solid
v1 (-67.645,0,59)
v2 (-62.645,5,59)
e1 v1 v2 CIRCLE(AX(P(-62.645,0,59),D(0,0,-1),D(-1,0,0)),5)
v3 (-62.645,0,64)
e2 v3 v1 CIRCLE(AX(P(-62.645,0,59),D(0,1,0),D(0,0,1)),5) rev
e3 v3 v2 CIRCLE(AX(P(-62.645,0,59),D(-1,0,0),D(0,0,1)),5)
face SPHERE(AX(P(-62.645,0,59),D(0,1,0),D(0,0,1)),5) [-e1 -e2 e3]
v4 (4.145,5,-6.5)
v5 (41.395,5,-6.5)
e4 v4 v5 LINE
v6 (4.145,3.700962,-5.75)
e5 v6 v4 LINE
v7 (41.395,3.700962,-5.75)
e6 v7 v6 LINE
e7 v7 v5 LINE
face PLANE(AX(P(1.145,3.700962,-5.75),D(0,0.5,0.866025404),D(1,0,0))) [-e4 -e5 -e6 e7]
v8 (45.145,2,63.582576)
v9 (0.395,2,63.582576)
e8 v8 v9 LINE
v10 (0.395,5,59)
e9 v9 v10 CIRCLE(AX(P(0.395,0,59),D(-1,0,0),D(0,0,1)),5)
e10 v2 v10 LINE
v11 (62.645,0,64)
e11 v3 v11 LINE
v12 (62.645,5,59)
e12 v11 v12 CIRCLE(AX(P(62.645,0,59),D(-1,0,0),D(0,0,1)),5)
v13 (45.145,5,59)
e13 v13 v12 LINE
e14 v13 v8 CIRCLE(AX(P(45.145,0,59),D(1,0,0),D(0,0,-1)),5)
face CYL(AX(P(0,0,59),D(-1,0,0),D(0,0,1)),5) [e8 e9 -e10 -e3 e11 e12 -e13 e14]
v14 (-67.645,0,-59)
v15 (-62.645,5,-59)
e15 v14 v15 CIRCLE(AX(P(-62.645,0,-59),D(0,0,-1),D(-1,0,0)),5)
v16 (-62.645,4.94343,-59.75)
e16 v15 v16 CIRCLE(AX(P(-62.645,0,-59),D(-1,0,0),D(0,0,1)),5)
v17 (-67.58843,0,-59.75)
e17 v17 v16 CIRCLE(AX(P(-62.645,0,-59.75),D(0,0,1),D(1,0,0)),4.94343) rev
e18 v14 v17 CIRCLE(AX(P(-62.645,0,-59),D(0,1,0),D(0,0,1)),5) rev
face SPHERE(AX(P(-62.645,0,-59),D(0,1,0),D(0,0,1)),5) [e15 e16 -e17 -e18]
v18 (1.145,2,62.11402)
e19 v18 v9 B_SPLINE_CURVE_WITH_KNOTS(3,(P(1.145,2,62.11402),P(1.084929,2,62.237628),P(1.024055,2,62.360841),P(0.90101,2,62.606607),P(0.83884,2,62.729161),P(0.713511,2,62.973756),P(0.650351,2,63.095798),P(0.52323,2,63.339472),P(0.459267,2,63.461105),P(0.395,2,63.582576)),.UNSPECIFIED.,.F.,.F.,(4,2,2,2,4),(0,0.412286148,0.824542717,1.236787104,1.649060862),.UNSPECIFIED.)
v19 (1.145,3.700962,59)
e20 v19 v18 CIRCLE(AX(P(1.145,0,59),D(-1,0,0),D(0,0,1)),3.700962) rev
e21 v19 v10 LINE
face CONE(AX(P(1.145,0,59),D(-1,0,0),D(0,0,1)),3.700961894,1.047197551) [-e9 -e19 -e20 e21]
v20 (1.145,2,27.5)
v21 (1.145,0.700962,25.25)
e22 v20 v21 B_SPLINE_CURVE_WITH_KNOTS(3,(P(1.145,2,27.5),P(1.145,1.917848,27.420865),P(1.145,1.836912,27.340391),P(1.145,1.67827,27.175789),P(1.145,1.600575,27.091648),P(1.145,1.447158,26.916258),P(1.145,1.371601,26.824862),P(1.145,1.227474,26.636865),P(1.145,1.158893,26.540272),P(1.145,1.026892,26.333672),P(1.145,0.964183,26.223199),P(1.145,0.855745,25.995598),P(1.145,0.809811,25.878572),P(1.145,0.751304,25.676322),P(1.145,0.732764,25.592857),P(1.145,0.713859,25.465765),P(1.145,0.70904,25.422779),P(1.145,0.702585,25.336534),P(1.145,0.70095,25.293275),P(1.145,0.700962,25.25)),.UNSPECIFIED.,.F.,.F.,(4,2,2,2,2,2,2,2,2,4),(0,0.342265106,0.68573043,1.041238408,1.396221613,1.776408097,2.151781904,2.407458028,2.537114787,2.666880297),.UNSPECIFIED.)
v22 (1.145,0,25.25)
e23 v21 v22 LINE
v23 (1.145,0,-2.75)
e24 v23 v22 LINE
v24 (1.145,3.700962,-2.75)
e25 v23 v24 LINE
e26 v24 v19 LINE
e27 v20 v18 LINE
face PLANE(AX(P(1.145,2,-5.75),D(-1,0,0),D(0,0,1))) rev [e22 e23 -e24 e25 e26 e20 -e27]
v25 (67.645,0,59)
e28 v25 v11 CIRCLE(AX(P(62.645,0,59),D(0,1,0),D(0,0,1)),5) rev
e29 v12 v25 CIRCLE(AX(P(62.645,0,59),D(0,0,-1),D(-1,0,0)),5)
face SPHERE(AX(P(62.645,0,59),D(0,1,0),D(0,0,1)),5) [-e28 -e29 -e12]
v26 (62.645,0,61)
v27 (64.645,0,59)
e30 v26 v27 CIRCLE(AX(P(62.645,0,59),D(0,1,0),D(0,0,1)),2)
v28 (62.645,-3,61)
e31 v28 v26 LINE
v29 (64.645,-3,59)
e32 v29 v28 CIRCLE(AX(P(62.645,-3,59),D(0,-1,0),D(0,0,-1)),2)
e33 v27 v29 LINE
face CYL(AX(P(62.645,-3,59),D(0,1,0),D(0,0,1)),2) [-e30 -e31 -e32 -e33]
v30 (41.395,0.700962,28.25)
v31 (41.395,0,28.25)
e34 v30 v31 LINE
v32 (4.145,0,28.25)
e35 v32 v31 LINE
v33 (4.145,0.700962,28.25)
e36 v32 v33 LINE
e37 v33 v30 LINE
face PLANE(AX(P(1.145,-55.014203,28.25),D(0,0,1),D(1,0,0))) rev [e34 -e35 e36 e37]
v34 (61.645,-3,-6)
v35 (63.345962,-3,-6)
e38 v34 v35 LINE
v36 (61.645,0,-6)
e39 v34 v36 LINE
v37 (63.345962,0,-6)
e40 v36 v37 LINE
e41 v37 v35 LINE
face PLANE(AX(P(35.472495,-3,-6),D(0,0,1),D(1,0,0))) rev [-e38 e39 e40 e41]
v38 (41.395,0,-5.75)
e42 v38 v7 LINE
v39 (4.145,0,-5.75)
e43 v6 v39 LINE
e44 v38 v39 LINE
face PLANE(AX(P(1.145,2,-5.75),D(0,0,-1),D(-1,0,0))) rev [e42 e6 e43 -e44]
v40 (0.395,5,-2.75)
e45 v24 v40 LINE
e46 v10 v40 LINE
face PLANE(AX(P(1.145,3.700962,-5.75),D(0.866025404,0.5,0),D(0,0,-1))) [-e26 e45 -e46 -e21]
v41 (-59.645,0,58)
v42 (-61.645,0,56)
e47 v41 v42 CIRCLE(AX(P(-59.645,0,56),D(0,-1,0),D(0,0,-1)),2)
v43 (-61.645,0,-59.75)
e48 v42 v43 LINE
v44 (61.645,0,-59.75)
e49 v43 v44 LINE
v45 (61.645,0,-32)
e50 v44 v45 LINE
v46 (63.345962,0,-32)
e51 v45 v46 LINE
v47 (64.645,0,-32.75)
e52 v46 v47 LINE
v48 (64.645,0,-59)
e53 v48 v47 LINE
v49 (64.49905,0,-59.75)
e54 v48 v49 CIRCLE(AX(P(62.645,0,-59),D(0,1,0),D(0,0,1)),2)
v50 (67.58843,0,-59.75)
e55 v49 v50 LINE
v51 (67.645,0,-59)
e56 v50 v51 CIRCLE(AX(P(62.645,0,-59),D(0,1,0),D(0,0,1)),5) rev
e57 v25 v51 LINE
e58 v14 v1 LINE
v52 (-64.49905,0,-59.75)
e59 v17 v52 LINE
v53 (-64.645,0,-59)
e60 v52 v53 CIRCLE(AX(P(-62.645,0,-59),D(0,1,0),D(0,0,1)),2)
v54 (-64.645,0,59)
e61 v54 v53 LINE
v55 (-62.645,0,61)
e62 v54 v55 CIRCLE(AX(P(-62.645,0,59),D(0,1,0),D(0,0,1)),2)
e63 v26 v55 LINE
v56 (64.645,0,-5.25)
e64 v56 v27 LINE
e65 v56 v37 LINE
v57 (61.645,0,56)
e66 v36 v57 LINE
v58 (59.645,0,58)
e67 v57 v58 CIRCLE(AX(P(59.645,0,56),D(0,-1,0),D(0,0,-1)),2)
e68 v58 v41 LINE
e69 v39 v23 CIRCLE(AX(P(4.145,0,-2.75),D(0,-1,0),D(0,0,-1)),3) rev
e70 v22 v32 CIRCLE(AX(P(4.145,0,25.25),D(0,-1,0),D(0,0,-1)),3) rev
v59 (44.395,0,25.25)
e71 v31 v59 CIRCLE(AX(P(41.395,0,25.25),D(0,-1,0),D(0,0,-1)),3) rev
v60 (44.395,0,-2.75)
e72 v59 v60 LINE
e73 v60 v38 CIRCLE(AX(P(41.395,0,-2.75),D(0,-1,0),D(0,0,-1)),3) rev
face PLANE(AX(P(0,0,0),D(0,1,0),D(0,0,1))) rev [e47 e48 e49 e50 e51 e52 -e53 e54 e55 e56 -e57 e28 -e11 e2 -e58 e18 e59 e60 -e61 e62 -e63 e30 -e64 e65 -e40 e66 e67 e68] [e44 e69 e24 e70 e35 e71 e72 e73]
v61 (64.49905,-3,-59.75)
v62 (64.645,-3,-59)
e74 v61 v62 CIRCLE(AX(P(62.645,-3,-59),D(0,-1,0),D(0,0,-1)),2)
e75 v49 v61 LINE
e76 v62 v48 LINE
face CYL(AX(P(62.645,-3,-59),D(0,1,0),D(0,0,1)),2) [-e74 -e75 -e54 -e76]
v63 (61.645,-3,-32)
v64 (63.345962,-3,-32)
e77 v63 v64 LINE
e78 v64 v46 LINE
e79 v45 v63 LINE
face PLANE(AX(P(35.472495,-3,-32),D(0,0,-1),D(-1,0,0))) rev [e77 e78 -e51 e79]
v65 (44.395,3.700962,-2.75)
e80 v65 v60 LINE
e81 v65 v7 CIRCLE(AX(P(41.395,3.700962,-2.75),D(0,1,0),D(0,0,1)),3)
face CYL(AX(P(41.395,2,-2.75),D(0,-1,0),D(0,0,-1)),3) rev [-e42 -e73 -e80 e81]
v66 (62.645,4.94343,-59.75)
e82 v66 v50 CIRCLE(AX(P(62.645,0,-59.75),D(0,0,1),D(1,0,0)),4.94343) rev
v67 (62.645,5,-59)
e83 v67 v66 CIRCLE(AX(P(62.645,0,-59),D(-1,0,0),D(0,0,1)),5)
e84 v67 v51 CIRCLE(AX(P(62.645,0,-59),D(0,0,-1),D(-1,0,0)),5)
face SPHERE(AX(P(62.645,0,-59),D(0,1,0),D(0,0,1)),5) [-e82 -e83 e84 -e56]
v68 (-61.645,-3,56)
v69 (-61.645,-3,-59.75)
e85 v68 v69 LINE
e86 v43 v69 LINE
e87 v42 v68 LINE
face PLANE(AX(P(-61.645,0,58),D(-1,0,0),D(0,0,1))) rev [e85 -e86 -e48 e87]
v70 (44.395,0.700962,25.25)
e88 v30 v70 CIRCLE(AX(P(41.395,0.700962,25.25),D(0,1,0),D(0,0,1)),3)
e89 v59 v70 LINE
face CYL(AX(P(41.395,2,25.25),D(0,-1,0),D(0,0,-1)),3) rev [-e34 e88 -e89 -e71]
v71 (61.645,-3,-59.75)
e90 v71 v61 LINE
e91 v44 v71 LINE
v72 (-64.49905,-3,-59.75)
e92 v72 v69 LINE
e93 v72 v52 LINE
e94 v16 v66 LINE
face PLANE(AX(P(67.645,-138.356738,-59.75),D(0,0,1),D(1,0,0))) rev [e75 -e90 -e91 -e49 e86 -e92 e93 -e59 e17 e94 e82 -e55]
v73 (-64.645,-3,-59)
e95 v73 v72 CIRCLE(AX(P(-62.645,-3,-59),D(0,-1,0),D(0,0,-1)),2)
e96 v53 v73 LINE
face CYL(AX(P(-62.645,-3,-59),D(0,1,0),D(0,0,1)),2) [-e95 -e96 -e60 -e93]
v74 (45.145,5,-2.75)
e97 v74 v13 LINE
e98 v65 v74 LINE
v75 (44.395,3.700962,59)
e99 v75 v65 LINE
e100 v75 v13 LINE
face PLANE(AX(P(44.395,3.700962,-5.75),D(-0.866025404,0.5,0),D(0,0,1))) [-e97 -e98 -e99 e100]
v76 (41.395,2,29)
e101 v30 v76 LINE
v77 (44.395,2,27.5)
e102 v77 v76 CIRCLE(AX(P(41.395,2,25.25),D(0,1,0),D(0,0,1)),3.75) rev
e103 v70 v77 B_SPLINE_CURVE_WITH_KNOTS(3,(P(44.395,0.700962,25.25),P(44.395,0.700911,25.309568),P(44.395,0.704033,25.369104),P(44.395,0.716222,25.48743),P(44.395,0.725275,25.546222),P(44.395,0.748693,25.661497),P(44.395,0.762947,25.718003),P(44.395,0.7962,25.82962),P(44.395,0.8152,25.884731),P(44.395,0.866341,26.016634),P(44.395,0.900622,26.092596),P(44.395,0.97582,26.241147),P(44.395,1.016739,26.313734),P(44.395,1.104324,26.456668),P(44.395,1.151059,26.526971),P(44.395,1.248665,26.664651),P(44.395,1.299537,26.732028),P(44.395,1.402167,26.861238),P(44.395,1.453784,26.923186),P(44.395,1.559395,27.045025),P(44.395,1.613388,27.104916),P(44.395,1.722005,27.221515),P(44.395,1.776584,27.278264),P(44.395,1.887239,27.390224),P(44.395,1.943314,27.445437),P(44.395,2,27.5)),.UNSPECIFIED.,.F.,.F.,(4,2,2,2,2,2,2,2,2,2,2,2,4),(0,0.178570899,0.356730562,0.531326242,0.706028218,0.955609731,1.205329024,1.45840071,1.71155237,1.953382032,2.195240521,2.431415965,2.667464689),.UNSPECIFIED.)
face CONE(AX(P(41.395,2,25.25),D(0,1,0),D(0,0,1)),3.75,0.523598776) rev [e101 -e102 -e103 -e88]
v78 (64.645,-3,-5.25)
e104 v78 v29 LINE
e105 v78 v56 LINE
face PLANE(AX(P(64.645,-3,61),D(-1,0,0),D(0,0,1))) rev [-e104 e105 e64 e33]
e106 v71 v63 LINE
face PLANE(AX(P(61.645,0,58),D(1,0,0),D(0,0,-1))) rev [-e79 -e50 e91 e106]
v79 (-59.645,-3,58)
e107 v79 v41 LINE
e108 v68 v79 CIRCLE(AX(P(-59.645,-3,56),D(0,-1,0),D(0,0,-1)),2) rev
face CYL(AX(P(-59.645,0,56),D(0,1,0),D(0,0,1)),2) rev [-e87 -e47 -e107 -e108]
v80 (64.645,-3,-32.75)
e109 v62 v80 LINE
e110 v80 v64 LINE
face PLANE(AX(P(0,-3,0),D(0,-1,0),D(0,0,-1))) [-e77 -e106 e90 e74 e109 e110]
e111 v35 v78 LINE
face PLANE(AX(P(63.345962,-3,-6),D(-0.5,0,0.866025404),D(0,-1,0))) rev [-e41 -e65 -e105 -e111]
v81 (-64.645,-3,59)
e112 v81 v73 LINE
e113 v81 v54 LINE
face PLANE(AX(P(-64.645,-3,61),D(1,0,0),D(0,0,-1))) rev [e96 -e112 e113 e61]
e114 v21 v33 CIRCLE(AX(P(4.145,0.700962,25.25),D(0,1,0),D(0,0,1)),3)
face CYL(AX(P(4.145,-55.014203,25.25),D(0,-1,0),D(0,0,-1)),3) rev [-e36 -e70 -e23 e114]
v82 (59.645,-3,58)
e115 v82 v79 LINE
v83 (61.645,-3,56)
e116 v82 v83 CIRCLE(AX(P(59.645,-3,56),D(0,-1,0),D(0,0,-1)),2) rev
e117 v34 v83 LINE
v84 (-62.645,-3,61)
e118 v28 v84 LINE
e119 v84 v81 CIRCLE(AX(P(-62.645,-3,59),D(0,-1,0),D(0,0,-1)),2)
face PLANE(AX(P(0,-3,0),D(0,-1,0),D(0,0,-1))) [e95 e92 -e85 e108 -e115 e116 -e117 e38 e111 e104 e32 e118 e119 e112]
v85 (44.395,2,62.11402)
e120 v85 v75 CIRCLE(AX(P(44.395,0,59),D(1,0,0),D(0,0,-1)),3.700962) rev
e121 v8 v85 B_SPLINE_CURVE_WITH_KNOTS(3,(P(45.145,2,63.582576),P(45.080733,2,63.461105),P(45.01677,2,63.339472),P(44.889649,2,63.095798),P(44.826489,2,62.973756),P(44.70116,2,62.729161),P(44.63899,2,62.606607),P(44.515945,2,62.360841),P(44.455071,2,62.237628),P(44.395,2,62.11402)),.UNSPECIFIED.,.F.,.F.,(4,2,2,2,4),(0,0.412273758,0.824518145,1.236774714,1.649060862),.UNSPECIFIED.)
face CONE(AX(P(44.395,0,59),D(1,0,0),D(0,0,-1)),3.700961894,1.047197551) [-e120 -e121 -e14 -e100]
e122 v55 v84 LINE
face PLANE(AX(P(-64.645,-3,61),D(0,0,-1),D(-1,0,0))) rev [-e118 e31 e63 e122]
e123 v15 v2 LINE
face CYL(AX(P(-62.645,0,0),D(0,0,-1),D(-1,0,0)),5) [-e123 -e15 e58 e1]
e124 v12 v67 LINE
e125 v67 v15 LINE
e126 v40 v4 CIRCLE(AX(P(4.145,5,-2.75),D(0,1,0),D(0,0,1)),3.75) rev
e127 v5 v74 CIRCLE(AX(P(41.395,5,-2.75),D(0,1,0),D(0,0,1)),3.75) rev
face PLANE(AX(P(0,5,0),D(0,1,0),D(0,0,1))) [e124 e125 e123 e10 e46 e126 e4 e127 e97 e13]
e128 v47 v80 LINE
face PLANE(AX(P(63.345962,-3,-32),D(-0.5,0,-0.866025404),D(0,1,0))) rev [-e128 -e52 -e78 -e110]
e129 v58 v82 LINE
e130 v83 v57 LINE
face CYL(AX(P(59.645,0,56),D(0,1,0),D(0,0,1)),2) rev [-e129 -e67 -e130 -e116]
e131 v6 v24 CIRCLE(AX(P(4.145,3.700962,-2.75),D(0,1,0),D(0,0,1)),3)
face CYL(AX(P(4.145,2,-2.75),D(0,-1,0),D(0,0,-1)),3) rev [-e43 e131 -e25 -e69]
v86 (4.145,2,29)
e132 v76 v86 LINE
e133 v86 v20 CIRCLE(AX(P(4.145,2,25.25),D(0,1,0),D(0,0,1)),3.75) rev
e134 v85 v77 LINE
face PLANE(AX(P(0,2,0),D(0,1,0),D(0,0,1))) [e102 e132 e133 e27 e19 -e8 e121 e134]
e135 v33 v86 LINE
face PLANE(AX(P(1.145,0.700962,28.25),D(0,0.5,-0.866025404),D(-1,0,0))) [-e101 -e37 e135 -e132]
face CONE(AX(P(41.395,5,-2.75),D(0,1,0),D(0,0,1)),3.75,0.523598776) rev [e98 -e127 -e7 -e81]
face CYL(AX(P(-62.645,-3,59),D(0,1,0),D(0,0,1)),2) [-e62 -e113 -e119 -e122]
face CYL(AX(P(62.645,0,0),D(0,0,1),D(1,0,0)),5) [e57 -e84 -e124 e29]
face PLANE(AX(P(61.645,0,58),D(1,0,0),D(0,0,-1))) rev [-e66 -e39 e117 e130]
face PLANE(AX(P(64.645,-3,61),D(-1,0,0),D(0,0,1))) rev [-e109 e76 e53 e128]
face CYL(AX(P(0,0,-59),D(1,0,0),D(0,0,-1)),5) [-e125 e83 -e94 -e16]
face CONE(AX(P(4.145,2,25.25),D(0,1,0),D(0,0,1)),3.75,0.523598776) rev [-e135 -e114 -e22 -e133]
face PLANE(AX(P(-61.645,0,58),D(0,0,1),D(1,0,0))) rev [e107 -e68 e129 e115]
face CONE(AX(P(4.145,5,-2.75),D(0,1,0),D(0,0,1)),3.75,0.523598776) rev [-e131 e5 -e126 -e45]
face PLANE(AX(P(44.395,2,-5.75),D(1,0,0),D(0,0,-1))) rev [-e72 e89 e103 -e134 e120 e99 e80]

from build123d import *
from OCP.BRepFilletAPI import BRepFilletAPI_MakeChamfer

# Parameters (mm, degrees)
SKETCH1_W           = 135.29
SKETCH1_H           = 128
BOSS_EXTRUDE1_DEPTH = 5
SKETCH2_W           = 129.29
SKETCH2_H           = 122
BOSS_EXTRUDE2_DEPTH = 3
FILLET4_R           = 5
FILLET5_R           = 5
FILLET6_R           = 2
CUT_EXTRUDE1_REACH  = 95.466
SKETCH3_W           = 135.29
SKETCH3_H           = 4.25
SKETCH4_W           = 123.29
SKETCH4_H           = 117.75
CUT_EXTRUDE2_DEPTH  = 3
FILLET7_R           = 2
SKETCH5_W           = 43.25
SKETCH5_H           = 69.75
CUT_EXTRUDE3_DEPTH  = 3
SKETCH6_W           = 43.25
SKETCH6_H           = 34
CUT_EXTRUDE4_DEPTH  = 2
FILLET9_R           = 3
CHAMFER1_SIZE       = 0.75
CHAMFER1_SIZE2      = 1.299038106
CHAMFER2_SIZE       = 0.75
CHAMFER2_SIZE_2     = 1.299038106
SKETCH7_W           = 26
SKETCH7_H           = 3
CUT_EXTRUDE5_DEPTH  = 3
CHAMFER3_SIZE       = 0.75
CHAMFER3_SIZE2      = 1.299038106


# Some blends are built 0.0001 mm under size
with BuildPart() as part:
    # Sketch1 → Boss-Extrude1 (new body)
    with BuildSketch(Plane(origin=(0, 0, 0), x_dir=(1, 0, 0), z_dir=(0, 1, 0))):
        Rectangle(SKETCH1_W, SKETCH1_H)
    extrude(amount=BOSS_EXTRUDE1_DEPTH)

    # Sketch2 → Boss-Extrude2 (add)
    with BuildSketch(Plane.XZ):
        Rectangle(SKETCH2_W, SKETCH2_H)
    extrude(amount=BOSS_EXTRUDE2_DEPTH)

    # Fillet4
    fillet4_edges = [part.edges().sort_by_distance(p)[0] for p in [
        (-67.645, 2.5, -64),
        (67.645, 2.5, -64),
        (67.645, 2.5, 64),
        (-67.645, 2.5, 64),
    ]]
    fillet(fillet4_edges, radius=FILLET4_R)

    # Fillet5
    fillet5_edges = [part.edges().sort_by_distance(p)[0] for p in [
        (-66.180533906, 5, -62.535533906),
        (-67.645, 5, 0),
        (-66.180533906, 5, 62.535533906),
        (0, 5, 64),
        (66.180533906, 5, 62.535533906),
        (67.645, 5, 0),
        (66.180533906, 5, -62.535533906),
        (0, 5, -64),
    ]]
    fillet(fillet5_edges, radius=FILLET5_R - 0.0001)  # a hair under: the kernel refuses the full size

    # Fillet6
    fillet6_edges = [part.edges().sort_by_distance(p)[0] for p in [
        (-64.645, -1.5, 61),
        (-64.645, -1.5, -61),
        (64.645, -1.5, -61),
        (64.645, -1.5, 61),
    ]]
    fillet(fillet6_edges, radius=FILLET6_R)

    # Cut-Extrude1: up to this face of the body (flat: up to its plane)
    cut_extrude1_end = Plane(part.part.faces().sort_by_distance((0, -3, 0))[0])
    # Sketch3 → Cut-Extrude1 (cut, up to the picked face)
    with BuildSketch(Plane(origin=(0, 5, 0), x_dir=(1, 0, 0), z_dir=(0, 1, 0)), mode=Mode.PRIVATE) as cut_extrude1_sk1:
        with Locations((0, 61.875)):
            Rectangle(SKETCH3_W, SKETCH3_H)
    cut_extrude1_tool1 = split(extrude(cut_extrude1_sk1.sketch, amount=-CUT_EXTRUDE1_REACH, mode=Mode.PRIVATE), bisect_by=cut_extrude1_end, keep=Keep.BOTH, mode=Mode.PRIVATE)
    add(cut_extrude1_tool1.solids().sort_by(Axis((0, 5, -61.875), (0, -1, 0)))[0], mode=Mode.SUBTRACT)

    # Sketch4 → Cut-Extrude2 (cut)
    with BuildSketch(Plane.XZ.offset(3)):
        with Locations((0, -0.875)):
            Rectangle(SKETCH4_W, SKETCH4_H)
    extrude(amount=-CUT_EXTRUDE2_DEPTH, mode=Mode.SUBTRACT)

    # Fillet7
    fillet7_edges = [part.edges().sort_by_distance(p)[0] for p in [
        (-61.645, -1.5, 58),
        (61.645, -1.5, 58),
    ]]
    fillet(fillet7_edges, radius=FILLET7_R)

    # Sketch5 → Cut-Extrude3 (cut)
    with BuildSketch(Plane(origin=(0, 5, 0), x_dir=(1, 0, 0), z_dir=(0, 1, 0))):
        with Locations((22.77, -29.125)):
            Rectangle(SKETCH5_W, SKETCH5_H)
    extrude(amount=-CUT_EXTRUDE3_DEPTH, mode=Mode.SUBTRACT)

    # Sketch6 → Cut-Extrude4 (cut)
    with BuildSketch(Plane(origin=(0, 2, 0), x_dir=(1, 0, 0), z_dir=(0, 1, 0))):
        with Locations((22.77, -11.25)):
            Rectangle(SKETCH6_W, SKETCH6_H)
    extrude(amount=-CUT_EXTRUDE4_DEPTH, mode=Mode.SUBTRACT)

    # Fillet9
    fillet9_edges = [part.edges().sort_by_distance(p)[0] for p in [
        (1.145, 2.5, -5.75),
        (44.395, 2.5, -5.75),
        (44.395, 1, 28.25),
        (1.145, 1, 28.25),
    ]]
    fillet(fillet9_edges, radius=FILLET9_R)

    # Chamfer1: one chamfer whose edges measure the first distance from different faces: ONE call of the kernel's chamfer builder (chamfer() names one face for all edges)
    chamfer1_edges_1 = [part.edges().sort_by_distance(p)[0] for p in [
        (44.395, 4.183298538, 61.738685401),
        (1.145, 4.183298538, 61.738685401),
    ]]
    chamfer1_side_1 = [part.faces().sort_by_distance(p)[0] for p in [
        (0, 3.535563195, 62.535563195),
    ]]
    chamfer1_edges_2 = [part.edges().sort_by_distance(p)[0] for p in [
        (44.395, 5, 28.12505),
        (1.145, 5, 28.12505),
        (22.77, 5, -5.75),
        (43.516320344, 5, -4.871320344),
        (2.023679656, 5, -4.871320344),
    ]]
    chamfer1_side_2 = [part.faces().sort_by_distance(p)[0] for p in [
        (-5.311957969, 5, -6.221509605),
    ]]
    chamfer1 = BRepFilletAPI_MakeChamfer(part.part.solid().wrapped)
    for e in chamfer1_edges_1:
        chamfer1.Add(CHAMFER1_SIZE, CHAMFER1_SIZE2, e.wrapped, chamfer1_side_1[0].wrapped)  # the first distance lies on this face
    for e in chamfer1_edges_2:
        chamfer1.Add(CHAMFER1_SIZE, CHAMFER1_SIZE2, e.wrapped, chamfer1_side_2[0].wrapped)  # the first distance lies on this face
    add(Compound.cast(chamfer1.Shape()), mode=Mode.REPLACE)

    # Chamfer2
    # the kernel refuses this chamfer: 1.299038106, 0.75 mm, written as the material it takes off along each edge
    with BuildSketch(Plane(origin=(41.395, 2, 28.25), x_dir=(0, 0.05789386240267144, 0.9983227437537926), z_dir=(-1, 0, 0))) as chamfer2_piece_1:
        Polygon((CHAMFER2_SIZE * 0.998322743754, -CHAMFER2_SIZE * 0.0578938624027), (-CHAMFER2_SIZE_2 * 0.0578938623883, -CHAMFER2_SIZE_2 * 0.998322743505), (0, 0), align=None)
    extrude(amount=37.25, mode=Mode.SUBTRACT)
    with BuildSketch(Plane(origin=(4.145, 2, 25.25), x_dir=(-0.43506037057501545, 0, -0.9004012849586179), z_dir=(0.9004012849586179, 0, -0.43506037057501545))) as chamfer2_piece_2_section:
        Polygon((3 + CHAMFER2_SIZE, 0), (3, -CHAMFER2_SIZE_2), (3, 0), align=None)
    chamfer2_piece_2 = revolve(axis=Axis((4.145, 2, 25.25), (0, 1, 0)), revolution_arc=154.210864587, mode=Mode.PRIVATE)
    chamfer2_piece_2 = split(chamfer2_piece_2, bisect_by=Plane(origin=(1.145, 1.523753347, 27.427166172), z_dir=(1, 0, 0)), keep=Keep.TOP, mode=Mode.PRIVATE)
    add(chamfer2_piece_2, mode=Mode.SUBTRACT)
    with BuildSketch(Plane(origin=(41.395, 2, 25.25), x_dir=(0, 0, 1), z_dir=(-1, 0, 0))) as chamfer2_piece_3_section:
        Polygon((3 + CHAMFER2_SIZE, 0), (3, -CHAMFER2_SIZE_2), (3, 0), align=None)
    chamfer2_piece_3 = revolve(axis=Axis((41.395, 2, 25.25), (0, 1, 0)), revolution_arc=154.210864587, mode=Mode.PRIVATE)
    chamfer2_piece_3 = split(chamfer2_piece_3, bisect_by=Plane(origin=(44.395, 1.633451558, 28.466921633), z_dir=(-1, 0, 0)), keep=Keep.TOP, mode=Mode.PRIVATE)
    add(chamfer2_piece_3, mode=Mode.SUBTRACT)

    # Sketch7 → Cut-Extrude5 (cut)
    with BuildSketch(Plane(origin=(64.645, 0, 0), x_dir=(0, 0, -1), z_dir=(1, 0, 0))):
        with Locations((19, -1.5)):
            Rectangle(SKETCH7_W, SKETCH7_H)
    extrude(amount=-CUT_EXTRUDE5_DEPTH, mode=Mode.SUBTRACT)

    # Chamfer3: one chamfer whose edges measure the first distance from different faces: ONE call of the kernel's chamfer builder (chamfer() names one face for all edges)
    chamfer3_edges_1 = [part.edges().sort_by_distance(p)[0] for p in [
        (64.645, -1.5, -6),
    ]]
    chamfer3_side_1 = [part.faces().sort_by_distance(p)[0] for p in [
        (64.645, -1.5, 26.5),
    ]]
    chamfer3_edges_2 = [part.edges().sort_by_distance(p)[0] for p in [
        (64.645, -1.5, -32),
    ]]
    chamfer3_side_2 = [part.faces().sort_by_distance(p)[0] for p in [
        (64.645, -1.5, -45.5),
    ]]
    chamfer3 = BRepFilletAPI_MakeChamfer(part.part.solid().wrapped)
    for e in chamfer3_edges_1:
        chamfer3.Add(CHAMFER3_SIZE, CHAMFER3_SIZE2, e.wrapped, chamfer3_side_1[0].wrapped)  # the first distance lies on this face
    for e in chamfer3_edges_2:
        chamfer3.Add(CHAMFER3_SIZE, CHAMFER3_SIZE2, e.wrapped, chamfer3_side_2[0].wrapped)  # the first distance lies on this face
    add(Compound.cast(chamfer3.Shape()), mode=Mode.REPLACE)


solid = part.part
